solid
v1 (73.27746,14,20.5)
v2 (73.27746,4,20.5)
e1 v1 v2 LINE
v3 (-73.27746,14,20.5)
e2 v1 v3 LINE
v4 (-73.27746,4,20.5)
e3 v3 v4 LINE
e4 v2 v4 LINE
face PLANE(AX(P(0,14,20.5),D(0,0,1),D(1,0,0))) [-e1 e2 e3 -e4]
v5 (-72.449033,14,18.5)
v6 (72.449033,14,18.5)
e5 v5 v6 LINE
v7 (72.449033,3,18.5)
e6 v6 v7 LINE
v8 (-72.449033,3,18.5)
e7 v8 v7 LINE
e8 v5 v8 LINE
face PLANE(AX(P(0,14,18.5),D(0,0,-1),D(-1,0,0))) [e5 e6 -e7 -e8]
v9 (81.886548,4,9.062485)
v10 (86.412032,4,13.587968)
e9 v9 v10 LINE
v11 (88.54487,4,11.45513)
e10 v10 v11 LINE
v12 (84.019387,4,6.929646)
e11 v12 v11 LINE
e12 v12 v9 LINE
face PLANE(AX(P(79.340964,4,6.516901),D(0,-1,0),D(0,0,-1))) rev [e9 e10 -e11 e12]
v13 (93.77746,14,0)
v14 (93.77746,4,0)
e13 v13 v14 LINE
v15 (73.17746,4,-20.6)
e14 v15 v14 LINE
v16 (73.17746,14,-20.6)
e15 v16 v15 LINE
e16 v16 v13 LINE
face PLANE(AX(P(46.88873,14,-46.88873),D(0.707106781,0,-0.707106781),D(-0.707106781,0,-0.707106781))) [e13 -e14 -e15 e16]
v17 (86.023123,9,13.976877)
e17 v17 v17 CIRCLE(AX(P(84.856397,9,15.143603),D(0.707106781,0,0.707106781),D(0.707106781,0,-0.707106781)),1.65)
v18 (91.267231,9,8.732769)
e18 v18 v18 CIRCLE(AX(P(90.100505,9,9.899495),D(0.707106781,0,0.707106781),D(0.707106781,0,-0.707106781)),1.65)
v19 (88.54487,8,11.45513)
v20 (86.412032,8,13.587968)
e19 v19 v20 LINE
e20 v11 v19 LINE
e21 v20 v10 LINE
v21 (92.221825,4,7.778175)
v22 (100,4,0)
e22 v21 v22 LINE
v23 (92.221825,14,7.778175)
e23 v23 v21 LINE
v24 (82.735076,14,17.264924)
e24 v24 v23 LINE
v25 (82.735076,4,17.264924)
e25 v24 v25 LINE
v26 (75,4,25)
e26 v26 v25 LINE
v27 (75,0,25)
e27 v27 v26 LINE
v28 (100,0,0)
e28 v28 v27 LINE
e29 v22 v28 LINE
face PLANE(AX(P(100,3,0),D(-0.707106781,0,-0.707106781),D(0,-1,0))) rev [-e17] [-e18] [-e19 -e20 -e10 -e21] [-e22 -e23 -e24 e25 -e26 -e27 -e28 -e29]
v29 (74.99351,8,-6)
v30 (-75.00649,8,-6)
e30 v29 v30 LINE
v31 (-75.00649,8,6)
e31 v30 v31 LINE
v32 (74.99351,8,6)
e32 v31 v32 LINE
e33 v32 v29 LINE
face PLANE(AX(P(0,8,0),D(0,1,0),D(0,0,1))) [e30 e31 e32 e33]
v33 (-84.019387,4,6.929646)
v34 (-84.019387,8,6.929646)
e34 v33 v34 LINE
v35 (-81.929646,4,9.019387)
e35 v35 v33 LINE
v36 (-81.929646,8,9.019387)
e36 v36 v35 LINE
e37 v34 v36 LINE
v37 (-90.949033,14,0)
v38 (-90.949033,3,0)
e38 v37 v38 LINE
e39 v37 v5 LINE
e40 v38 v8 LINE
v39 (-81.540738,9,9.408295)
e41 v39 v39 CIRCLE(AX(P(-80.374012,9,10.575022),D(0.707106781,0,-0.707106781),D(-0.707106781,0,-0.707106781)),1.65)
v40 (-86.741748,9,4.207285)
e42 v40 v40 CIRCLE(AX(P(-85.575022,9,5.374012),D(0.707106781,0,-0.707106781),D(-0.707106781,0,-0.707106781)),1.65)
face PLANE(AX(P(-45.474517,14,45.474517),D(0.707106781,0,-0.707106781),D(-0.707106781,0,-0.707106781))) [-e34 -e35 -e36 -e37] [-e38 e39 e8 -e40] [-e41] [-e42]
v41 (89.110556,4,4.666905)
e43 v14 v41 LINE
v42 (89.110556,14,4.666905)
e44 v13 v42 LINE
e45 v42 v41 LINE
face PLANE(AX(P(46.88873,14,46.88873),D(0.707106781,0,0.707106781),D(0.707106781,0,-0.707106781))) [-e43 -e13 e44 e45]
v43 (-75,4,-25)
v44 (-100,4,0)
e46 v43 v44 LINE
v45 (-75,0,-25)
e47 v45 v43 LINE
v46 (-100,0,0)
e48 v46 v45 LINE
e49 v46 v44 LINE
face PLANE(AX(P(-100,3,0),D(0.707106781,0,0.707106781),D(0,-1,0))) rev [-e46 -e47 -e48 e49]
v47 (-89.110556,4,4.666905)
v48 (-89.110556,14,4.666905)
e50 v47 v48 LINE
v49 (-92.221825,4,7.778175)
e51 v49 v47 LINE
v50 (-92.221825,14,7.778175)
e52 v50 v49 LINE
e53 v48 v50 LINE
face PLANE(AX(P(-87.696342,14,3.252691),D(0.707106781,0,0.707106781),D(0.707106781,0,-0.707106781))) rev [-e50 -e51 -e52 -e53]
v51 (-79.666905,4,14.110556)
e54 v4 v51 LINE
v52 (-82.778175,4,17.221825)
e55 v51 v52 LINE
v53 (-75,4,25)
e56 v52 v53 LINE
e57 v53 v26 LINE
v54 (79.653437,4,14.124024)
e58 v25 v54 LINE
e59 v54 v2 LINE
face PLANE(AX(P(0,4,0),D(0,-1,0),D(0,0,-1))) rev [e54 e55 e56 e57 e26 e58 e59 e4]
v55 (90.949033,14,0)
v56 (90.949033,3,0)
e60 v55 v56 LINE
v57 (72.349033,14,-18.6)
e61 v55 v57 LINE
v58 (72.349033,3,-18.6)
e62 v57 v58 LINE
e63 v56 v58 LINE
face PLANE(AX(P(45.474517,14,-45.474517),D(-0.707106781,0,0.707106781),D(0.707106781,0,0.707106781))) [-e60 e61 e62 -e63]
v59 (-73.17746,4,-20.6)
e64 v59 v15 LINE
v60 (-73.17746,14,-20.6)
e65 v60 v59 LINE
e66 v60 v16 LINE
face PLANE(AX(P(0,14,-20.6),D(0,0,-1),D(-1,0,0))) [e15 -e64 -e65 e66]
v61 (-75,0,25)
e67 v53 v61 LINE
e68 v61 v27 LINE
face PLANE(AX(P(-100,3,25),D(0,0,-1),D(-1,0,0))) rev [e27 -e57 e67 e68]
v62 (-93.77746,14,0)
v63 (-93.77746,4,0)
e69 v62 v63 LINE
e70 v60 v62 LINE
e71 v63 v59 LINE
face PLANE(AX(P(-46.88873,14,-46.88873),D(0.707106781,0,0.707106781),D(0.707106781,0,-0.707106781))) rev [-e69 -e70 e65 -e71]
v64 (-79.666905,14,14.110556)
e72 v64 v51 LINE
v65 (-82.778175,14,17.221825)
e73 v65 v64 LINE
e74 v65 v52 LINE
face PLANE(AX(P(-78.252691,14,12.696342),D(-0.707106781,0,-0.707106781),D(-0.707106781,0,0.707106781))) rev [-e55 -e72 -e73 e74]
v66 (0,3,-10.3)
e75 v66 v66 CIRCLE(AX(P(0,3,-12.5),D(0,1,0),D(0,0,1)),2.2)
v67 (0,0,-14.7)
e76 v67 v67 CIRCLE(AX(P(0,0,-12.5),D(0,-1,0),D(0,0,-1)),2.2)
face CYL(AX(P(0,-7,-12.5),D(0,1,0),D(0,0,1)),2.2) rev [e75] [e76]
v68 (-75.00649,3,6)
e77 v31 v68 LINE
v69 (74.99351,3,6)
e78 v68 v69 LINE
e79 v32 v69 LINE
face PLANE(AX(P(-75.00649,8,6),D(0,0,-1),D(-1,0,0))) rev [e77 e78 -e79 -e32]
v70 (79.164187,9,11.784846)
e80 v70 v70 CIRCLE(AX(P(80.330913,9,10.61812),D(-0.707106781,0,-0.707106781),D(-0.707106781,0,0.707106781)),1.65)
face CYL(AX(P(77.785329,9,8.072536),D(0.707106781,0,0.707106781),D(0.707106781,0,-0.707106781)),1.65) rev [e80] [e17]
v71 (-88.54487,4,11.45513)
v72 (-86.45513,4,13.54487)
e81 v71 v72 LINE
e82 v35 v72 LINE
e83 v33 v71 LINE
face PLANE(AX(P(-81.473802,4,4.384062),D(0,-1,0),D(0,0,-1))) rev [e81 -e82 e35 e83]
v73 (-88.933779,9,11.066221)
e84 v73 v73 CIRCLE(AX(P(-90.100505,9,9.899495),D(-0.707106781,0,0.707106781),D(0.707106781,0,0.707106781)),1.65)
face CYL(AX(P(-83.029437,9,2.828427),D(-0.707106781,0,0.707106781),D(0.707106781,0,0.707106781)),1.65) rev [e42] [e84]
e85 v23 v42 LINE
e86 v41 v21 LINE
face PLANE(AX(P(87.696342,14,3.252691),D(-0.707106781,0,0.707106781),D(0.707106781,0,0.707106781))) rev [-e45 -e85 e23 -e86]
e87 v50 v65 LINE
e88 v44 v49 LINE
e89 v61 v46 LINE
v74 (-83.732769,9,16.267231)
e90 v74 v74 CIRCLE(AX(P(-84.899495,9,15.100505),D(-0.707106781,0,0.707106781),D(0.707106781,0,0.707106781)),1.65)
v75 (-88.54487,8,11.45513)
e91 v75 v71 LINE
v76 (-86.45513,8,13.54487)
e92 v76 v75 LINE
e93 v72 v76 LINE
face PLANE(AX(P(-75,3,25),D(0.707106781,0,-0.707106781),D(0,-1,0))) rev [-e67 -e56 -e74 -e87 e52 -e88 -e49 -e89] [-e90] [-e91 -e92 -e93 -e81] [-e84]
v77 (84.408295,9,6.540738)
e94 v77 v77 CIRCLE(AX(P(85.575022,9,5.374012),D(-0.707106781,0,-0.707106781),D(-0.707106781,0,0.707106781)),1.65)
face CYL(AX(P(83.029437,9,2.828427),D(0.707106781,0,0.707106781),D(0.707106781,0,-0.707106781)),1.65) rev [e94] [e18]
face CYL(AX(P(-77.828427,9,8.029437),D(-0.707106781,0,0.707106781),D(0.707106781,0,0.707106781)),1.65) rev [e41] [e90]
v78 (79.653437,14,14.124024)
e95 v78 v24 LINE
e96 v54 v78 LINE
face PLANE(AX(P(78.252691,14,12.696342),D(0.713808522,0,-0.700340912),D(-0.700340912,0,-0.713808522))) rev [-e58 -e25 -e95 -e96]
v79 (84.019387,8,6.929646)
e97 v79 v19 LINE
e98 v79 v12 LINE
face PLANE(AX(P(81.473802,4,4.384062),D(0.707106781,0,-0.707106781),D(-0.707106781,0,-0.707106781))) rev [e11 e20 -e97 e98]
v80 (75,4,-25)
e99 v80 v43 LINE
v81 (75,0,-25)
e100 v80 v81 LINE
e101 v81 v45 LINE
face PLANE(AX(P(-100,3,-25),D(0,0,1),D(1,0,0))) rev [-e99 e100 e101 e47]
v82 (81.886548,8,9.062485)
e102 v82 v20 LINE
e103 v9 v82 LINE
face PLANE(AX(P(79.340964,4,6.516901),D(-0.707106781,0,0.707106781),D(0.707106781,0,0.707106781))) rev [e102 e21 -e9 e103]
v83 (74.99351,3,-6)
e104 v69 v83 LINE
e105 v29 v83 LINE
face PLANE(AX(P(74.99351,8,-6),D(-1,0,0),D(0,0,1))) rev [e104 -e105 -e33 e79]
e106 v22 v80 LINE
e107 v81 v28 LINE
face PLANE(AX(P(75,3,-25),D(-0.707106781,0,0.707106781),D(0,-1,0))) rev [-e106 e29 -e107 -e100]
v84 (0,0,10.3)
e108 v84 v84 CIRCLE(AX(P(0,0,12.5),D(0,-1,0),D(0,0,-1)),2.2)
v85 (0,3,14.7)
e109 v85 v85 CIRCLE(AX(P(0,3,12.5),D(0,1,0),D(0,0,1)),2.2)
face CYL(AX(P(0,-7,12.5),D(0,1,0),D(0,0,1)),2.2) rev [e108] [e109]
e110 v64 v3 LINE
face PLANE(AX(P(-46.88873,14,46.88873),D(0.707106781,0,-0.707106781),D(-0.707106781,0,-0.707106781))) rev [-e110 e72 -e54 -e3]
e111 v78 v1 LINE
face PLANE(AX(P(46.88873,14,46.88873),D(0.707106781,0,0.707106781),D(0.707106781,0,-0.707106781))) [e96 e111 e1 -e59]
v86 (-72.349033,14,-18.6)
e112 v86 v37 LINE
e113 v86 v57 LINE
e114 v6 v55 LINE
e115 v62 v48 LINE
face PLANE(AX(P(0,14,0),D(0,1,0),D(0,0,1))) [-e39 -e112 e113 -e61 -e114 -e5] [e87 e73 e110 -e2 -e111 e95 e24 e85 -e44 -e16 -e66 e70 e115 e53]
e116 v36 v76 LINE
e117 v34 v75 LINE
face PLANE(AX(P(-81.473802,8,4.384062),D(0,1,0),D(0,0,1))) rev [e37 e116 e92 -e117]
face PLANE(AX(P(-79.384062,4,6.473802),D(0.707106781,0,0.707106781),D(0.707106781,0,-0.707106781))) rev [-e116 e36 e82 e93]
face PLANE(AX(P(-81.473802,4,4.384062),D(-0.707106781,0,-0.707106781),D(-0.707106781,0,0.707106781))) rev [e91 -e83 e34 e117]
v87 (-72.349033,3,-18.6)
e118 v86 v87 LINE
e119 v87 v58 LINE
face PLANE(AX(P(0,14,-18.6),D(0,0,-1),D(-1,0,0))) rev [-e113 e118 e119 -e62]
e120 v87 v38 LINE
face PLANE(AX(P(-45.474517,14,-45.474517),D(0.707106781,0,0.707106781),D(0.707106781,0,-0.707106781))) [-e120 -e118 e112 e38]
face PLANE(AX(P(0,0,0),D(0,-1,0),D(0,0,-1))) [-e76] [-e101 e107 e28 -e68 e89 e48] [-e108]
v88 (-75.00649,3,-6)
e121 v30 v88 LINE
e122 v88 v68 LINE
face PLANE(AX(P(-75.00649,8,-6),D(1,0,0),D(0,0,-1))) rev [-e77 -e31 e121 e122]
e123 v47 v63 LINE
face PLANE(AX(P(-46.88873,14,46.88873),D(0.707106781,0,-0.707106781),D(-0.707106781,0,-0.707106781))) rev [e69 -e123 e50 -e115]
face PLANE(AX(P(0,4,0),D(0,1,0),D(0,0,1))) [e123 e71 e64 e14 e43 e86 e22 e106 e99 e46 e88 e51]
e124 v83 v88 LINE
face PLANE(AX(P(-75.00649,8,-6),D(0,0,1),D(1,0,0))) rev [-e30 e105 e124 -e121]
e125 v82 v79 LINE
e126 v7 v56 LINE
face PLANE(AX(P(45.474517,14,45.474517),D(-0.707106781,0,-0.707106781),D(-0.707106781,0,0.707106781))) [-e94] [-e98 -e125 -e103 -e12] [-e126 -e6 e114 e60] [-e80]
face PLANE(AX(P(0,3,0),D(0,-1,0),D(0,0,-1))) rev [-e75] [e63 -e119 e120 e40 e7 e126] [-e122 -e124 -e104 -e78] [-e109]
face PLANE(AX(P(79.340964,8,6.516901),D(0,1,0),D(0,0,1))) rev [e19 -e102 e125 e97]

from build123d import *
from build123d.topology import SkipClean

# Parameters (mm, degrees)
SKIZZE1_W                       = 200
SKIZZE1_H                       = 50
AUFSATZ_LINEAR_AUSTRAGEN1_DEPTH = 3
FASE1_SIZE                      = 25
AUFSATZ_LINEAR_AUSTRAGEN2_DEPTH = 11
SKIZZE3_W                       = 15.35533906
SKIZZE3_H                       = 11
SCHNITT_LINEAR_AUSTRAGEN1_DEPTH = 10
SKIZZE4_W                       = 15.35533906
SKIZZE4_H                       = 11
SCHNITT_LINEAR_AUSTRAGEN2_DEPTH = 10
SKIZZE5_W                       = 150
SKIZZE5_H                       = 12
AUFSATZ_LINEAR_AUSTRAGEN3_DEPTH = 5
AUFSATZ_LINEAR_AUSTRAGEN4_DEPTH = 11
AUFSATZ_LINEAR_AUSTRAGEN5_DEPTH = 11
SKIZZE12_R                      = 2.2
SCHNITT_LINEAR_AUSTRAGEN8_DEPTH = 10
AUFSATZ_LINEAR_AUSTRAGEN6_DEPTH = 11
SKIZZE8_R                       = 1.65
SKIZZE8_W                       = 3.016289267
SKIZZE8_H                       = 4
SCHNITT_LINEAR_AUSTRAGEN9_DEPTH = 10
AUFSATZ_LINEAR_AUSTRAGEN7_DEPTH = 1
SKIZZE11_R                      = 1.65
SKIZZE11_W                      = 2.95533906
SKIZZE11_H                      = 4
SCHNITT_LINEAR_AUSTRAGEN7_DEPTH = 10


with BuildPart() as part:
    # Skizze1 → Aufsatz-Linear austragen1 (new body)
    with BuildSketch(Plane(origin=(0, 0, 0), x_dir=(1, 0, 0), z_dir=(0, 1, 0))):
        Rectangle(SKIZZE1_W, SKIZZE1_H)
    extrude(amount=AUFSATZ_LINEAR_AUSTRAGEN1_DEPTH)

    # Fase1
    fase1_edges = [part.edges().sort_by_distance(p)[0] for p in [
        (-100, 1.5, -25),
        (-100, 1.5, 25),
        (100, 1.5, -25),
        (100, 1.5, 25),
    ]]
    chamfer(fase1_edges, length=FASE1_SIZE - 0.0001)  # a hair under: the kernel refuses the full size

    # Skizze2 → Aufsatz-Linear austragen2 (add)
    with BuildSketch(Plane(origin=(0, 3, 0), x_dir=(1, 0, 0), z_dir=(0, 1, 0))):
        Polygon((-73.177460326, 20.6), (-93.777460326, 0), (-73.277460326, -20.5), (73.277460326, -20.5), (93.777460326, 0), (73.177460326, 20.6), align=None)
        Polygon((90.949033201, 0), (72.349033201, 18.6), (-72.349033201, 18.6), (-90.949033201, 0), (-72.449033201, -18.5), (72.449033201, -18.5), align=None, mode=Mode.SUBTRACT)
    extrude(amount=AUFSATZ_LINEAR_AUSTRAGEN2_DEPTH)

    # Skizze3 → Schnitt-Linear austragen1 (cut)
    with BuildSketch(Plane(origin=(-46.888730163, 0, 46.888730163), x_dir=(0.7071067811865476, 0, 0.7071067811865476), z_dir=(-0.7071067811865476, 0, 0.7071067811865476))):
        with Locations((-53.033008589, 8.5)):
            Rectangle(SKIZZE3_W, SKIZZE3_H)
    extrude(amount=-SCHNITT_LINEAR_AUSTRAGEN1_DEPTH, mode=Mode.SUBTRACT)

    # Skizze4 → Schnitt-Linear austragen2 (cut)
    with BuildSketch(Plane(origin=(46.888730163, 0, 46.888730163), x_dir=(0.7071067811865475, 0, -0.7071067811865477), z_dir=(0.7071067811865477, 0, 0.7071067811865475))):
        with Locations((53.033008589, 8.5)):
            Rectangle(SKIZZE4_W, SKIZZE4_H)
    extrude(amount=-SCHNITT_LINEAR_AUSTRAGEN2_DEPTH, mode=Mode.SUBTRACT)

    # Skizze5 → Aufsatz-Linear austragen3 (add)
    with BuildSketch(Plane(origin=(0, 3, 0), x_dir=(1, 0, 0), z_dir=(0, 1, 0))):
        with Locations((-0.006490323, 0)):
            Rectangle(SKIZZE5_W, SKIZZE5_H)
    extrude(amount=AUFSATZ_LINEAR_AUSTRAGEN3_DEPTH)

    # Skizze6 → Aufsatz-Linear austragen4 (add)
    with BuildSketch(Plane(origin=(0, 3, 0), x_dir=(1, 0, 0), z_dir=(0, 1, 0))):
        Polygon((87.696342007, -3.252691193), (78.252691193, -12.696342007), (82.735076288, -17.264923712), (92.221825407, -7.778174593), align=None)
    extrude(amount=AUFSATZ_LINEAR_AUSTRAGEN4_DEPTH)

    # Skizze10 → Aufsatz-Linear austragen5 (add)
    with BuildSketch(Plane(origin=(0, 3, 0), x_dir=(1, 0, 0), z_dir=(0, 1, 0))):
        Polygon((-87.696342007, -3.252691193), (-78.252691193, -12.696342007), (-82.778174593, -17.221825407), (-92.221825407, -7.778174593), align=None)
    extrude(amount=AUFSATZ_LINEAR_AUSTRAGEN5_DEPTH)

    # Skizze12 → Schnitt-Linear austragen8 (cut)
    with BuildSketch(Plane(origin=(0, 3, 0), x_dir=(1, 0, 0), z_dir=(0, 1, 0))):
        with Locations(Location((0, 12.5, 0), (0, 0, 270))):
            Circle(SKIZZE12_R)
        with Locations(Location((0, -12.5, 0), (0, 0, 270))):
            Circle(SKIZZE12_R)
    extrude(amount=-SCHNITT_LINEAR_AUSTRAGEN8_DEPTH, mode=Mode.SUBTRACT)

    # Skizze13 → Aufsatz-Linear austragen6 (add)
    with BuildSketch(Plane(origin=(0, 3, 0), x_dir=(1, 0, 0), z_dir=(0, 1, 0))):
        Polygon((89.817662351, -3.959797975), (88.403448789, -2.545584412), (87.69285367, -3.256179531), (89.107067232, -4.670393094), align=None)
        Polygon((-89.817662351, -3.959797975), (-88.403448789, -2.545584412), (-87.689553601, -3.2594796), (-89.103767163, -4.673693162), align=None)
        Polygon((78.959797975, -14.817662351), (77.545584412, -13.403448789), (78.257117259, -12.691915942), (79.671330821, -14.106129505), align=None)
        Polygon((-78.959797975, -14.817662351), (-77.545584412, -13.403448789), (-78.262212477, -12.686820723), (-79.67642604, -14.101034286), align=None)
    extrude(amount=AUFSATZ_LINEAR_AUSTRAGEN6_DEPTH)

    # Skizze8 → Schnitt-Linear austragen9 (cut)
    with BuildSketch(Plane(origin=(50, 0, 50), x_dir=(0.7071067811865488, 0, -0.7071067811865465), z_dir=(0.7071067811865465, 0, 0.7071067811865488))):
        with Locations((49.294388852, 9)):
            Circle(SKIZZE8_R)
        with Locations((56.710678119, 9)):
            Circle(SKIZZE8_R)
        with Locations((53.002533486, 6)):
            Rectangle(SKIZZE8_W, SKIZZE8_H)
    extrude(amount=-SCHNITT_LINEAR_AUSTRAGEN9_DEPTH, mode=Mode.SUBTRACT)

    # Skizze14 → Aufsatz-Linear austragen7 (add)
    with SkipClean():  # the faces are left unmerged after this step: merging them gives an invalid solid
        with BuildSketch(Plane(origin=(0, 3, 0), x_dir=(1, 0, 0), z_dir=(0, 1, 0))):
            Polygon((-89.11055557, -4.666904756), (-93.777460326, 0), (-73.177460326, 20.6), (73.177460326, 20.6), (93.777460326, 0), (89.11055557, -4.666904756), (92.221825407, -7.778174593), (100, 0), (75, 25), (-75, 25), (-100, 0), (-92.221825407, -7.778174593), align=None)
            Polygon((-82.778174593, -17.221825407), (-79.666904756, -14.11055557), (-73.277460326, -20.5), (73.277460326, -20.5), (79.653436535, -14.12402379), (82.735076288, -17.264923712), (75, -25), (-75, -25), align=None)
        extrude(amount=AUFSATZ_LINEAR_AUSTRAGEN7_DEPTH)

    # Skizze11 → Schnitt-Linear austragen7 (cut)
    with SkipClean():  # the faces are left unmerged after this step: merging them gives an invalid solid
        with BuildSketch(Plane(origin=(-50, 0, 50), x_dir=(0.7071067811865465, 0, 0.7071067811865488), z_dir=(-0.7071067811865488, 0, 0.7071067811865465))):
            with Locations((-56.710678119, 9)):
                Circle(SKIZZE11_R)
            with Locations((-49.355339059, 9)):
                Circle(SKIZZE11_R)
            with Locations((-53.033008589, 6)):
                Rectangle(SKIZZE11_W, SKIZZE11_H)
        extrude(amount=-SCHNITT_LINEAR_AUSTRAGEN7_DEPTH, mode=Mode.SUBTRACT)


solid = part.part
